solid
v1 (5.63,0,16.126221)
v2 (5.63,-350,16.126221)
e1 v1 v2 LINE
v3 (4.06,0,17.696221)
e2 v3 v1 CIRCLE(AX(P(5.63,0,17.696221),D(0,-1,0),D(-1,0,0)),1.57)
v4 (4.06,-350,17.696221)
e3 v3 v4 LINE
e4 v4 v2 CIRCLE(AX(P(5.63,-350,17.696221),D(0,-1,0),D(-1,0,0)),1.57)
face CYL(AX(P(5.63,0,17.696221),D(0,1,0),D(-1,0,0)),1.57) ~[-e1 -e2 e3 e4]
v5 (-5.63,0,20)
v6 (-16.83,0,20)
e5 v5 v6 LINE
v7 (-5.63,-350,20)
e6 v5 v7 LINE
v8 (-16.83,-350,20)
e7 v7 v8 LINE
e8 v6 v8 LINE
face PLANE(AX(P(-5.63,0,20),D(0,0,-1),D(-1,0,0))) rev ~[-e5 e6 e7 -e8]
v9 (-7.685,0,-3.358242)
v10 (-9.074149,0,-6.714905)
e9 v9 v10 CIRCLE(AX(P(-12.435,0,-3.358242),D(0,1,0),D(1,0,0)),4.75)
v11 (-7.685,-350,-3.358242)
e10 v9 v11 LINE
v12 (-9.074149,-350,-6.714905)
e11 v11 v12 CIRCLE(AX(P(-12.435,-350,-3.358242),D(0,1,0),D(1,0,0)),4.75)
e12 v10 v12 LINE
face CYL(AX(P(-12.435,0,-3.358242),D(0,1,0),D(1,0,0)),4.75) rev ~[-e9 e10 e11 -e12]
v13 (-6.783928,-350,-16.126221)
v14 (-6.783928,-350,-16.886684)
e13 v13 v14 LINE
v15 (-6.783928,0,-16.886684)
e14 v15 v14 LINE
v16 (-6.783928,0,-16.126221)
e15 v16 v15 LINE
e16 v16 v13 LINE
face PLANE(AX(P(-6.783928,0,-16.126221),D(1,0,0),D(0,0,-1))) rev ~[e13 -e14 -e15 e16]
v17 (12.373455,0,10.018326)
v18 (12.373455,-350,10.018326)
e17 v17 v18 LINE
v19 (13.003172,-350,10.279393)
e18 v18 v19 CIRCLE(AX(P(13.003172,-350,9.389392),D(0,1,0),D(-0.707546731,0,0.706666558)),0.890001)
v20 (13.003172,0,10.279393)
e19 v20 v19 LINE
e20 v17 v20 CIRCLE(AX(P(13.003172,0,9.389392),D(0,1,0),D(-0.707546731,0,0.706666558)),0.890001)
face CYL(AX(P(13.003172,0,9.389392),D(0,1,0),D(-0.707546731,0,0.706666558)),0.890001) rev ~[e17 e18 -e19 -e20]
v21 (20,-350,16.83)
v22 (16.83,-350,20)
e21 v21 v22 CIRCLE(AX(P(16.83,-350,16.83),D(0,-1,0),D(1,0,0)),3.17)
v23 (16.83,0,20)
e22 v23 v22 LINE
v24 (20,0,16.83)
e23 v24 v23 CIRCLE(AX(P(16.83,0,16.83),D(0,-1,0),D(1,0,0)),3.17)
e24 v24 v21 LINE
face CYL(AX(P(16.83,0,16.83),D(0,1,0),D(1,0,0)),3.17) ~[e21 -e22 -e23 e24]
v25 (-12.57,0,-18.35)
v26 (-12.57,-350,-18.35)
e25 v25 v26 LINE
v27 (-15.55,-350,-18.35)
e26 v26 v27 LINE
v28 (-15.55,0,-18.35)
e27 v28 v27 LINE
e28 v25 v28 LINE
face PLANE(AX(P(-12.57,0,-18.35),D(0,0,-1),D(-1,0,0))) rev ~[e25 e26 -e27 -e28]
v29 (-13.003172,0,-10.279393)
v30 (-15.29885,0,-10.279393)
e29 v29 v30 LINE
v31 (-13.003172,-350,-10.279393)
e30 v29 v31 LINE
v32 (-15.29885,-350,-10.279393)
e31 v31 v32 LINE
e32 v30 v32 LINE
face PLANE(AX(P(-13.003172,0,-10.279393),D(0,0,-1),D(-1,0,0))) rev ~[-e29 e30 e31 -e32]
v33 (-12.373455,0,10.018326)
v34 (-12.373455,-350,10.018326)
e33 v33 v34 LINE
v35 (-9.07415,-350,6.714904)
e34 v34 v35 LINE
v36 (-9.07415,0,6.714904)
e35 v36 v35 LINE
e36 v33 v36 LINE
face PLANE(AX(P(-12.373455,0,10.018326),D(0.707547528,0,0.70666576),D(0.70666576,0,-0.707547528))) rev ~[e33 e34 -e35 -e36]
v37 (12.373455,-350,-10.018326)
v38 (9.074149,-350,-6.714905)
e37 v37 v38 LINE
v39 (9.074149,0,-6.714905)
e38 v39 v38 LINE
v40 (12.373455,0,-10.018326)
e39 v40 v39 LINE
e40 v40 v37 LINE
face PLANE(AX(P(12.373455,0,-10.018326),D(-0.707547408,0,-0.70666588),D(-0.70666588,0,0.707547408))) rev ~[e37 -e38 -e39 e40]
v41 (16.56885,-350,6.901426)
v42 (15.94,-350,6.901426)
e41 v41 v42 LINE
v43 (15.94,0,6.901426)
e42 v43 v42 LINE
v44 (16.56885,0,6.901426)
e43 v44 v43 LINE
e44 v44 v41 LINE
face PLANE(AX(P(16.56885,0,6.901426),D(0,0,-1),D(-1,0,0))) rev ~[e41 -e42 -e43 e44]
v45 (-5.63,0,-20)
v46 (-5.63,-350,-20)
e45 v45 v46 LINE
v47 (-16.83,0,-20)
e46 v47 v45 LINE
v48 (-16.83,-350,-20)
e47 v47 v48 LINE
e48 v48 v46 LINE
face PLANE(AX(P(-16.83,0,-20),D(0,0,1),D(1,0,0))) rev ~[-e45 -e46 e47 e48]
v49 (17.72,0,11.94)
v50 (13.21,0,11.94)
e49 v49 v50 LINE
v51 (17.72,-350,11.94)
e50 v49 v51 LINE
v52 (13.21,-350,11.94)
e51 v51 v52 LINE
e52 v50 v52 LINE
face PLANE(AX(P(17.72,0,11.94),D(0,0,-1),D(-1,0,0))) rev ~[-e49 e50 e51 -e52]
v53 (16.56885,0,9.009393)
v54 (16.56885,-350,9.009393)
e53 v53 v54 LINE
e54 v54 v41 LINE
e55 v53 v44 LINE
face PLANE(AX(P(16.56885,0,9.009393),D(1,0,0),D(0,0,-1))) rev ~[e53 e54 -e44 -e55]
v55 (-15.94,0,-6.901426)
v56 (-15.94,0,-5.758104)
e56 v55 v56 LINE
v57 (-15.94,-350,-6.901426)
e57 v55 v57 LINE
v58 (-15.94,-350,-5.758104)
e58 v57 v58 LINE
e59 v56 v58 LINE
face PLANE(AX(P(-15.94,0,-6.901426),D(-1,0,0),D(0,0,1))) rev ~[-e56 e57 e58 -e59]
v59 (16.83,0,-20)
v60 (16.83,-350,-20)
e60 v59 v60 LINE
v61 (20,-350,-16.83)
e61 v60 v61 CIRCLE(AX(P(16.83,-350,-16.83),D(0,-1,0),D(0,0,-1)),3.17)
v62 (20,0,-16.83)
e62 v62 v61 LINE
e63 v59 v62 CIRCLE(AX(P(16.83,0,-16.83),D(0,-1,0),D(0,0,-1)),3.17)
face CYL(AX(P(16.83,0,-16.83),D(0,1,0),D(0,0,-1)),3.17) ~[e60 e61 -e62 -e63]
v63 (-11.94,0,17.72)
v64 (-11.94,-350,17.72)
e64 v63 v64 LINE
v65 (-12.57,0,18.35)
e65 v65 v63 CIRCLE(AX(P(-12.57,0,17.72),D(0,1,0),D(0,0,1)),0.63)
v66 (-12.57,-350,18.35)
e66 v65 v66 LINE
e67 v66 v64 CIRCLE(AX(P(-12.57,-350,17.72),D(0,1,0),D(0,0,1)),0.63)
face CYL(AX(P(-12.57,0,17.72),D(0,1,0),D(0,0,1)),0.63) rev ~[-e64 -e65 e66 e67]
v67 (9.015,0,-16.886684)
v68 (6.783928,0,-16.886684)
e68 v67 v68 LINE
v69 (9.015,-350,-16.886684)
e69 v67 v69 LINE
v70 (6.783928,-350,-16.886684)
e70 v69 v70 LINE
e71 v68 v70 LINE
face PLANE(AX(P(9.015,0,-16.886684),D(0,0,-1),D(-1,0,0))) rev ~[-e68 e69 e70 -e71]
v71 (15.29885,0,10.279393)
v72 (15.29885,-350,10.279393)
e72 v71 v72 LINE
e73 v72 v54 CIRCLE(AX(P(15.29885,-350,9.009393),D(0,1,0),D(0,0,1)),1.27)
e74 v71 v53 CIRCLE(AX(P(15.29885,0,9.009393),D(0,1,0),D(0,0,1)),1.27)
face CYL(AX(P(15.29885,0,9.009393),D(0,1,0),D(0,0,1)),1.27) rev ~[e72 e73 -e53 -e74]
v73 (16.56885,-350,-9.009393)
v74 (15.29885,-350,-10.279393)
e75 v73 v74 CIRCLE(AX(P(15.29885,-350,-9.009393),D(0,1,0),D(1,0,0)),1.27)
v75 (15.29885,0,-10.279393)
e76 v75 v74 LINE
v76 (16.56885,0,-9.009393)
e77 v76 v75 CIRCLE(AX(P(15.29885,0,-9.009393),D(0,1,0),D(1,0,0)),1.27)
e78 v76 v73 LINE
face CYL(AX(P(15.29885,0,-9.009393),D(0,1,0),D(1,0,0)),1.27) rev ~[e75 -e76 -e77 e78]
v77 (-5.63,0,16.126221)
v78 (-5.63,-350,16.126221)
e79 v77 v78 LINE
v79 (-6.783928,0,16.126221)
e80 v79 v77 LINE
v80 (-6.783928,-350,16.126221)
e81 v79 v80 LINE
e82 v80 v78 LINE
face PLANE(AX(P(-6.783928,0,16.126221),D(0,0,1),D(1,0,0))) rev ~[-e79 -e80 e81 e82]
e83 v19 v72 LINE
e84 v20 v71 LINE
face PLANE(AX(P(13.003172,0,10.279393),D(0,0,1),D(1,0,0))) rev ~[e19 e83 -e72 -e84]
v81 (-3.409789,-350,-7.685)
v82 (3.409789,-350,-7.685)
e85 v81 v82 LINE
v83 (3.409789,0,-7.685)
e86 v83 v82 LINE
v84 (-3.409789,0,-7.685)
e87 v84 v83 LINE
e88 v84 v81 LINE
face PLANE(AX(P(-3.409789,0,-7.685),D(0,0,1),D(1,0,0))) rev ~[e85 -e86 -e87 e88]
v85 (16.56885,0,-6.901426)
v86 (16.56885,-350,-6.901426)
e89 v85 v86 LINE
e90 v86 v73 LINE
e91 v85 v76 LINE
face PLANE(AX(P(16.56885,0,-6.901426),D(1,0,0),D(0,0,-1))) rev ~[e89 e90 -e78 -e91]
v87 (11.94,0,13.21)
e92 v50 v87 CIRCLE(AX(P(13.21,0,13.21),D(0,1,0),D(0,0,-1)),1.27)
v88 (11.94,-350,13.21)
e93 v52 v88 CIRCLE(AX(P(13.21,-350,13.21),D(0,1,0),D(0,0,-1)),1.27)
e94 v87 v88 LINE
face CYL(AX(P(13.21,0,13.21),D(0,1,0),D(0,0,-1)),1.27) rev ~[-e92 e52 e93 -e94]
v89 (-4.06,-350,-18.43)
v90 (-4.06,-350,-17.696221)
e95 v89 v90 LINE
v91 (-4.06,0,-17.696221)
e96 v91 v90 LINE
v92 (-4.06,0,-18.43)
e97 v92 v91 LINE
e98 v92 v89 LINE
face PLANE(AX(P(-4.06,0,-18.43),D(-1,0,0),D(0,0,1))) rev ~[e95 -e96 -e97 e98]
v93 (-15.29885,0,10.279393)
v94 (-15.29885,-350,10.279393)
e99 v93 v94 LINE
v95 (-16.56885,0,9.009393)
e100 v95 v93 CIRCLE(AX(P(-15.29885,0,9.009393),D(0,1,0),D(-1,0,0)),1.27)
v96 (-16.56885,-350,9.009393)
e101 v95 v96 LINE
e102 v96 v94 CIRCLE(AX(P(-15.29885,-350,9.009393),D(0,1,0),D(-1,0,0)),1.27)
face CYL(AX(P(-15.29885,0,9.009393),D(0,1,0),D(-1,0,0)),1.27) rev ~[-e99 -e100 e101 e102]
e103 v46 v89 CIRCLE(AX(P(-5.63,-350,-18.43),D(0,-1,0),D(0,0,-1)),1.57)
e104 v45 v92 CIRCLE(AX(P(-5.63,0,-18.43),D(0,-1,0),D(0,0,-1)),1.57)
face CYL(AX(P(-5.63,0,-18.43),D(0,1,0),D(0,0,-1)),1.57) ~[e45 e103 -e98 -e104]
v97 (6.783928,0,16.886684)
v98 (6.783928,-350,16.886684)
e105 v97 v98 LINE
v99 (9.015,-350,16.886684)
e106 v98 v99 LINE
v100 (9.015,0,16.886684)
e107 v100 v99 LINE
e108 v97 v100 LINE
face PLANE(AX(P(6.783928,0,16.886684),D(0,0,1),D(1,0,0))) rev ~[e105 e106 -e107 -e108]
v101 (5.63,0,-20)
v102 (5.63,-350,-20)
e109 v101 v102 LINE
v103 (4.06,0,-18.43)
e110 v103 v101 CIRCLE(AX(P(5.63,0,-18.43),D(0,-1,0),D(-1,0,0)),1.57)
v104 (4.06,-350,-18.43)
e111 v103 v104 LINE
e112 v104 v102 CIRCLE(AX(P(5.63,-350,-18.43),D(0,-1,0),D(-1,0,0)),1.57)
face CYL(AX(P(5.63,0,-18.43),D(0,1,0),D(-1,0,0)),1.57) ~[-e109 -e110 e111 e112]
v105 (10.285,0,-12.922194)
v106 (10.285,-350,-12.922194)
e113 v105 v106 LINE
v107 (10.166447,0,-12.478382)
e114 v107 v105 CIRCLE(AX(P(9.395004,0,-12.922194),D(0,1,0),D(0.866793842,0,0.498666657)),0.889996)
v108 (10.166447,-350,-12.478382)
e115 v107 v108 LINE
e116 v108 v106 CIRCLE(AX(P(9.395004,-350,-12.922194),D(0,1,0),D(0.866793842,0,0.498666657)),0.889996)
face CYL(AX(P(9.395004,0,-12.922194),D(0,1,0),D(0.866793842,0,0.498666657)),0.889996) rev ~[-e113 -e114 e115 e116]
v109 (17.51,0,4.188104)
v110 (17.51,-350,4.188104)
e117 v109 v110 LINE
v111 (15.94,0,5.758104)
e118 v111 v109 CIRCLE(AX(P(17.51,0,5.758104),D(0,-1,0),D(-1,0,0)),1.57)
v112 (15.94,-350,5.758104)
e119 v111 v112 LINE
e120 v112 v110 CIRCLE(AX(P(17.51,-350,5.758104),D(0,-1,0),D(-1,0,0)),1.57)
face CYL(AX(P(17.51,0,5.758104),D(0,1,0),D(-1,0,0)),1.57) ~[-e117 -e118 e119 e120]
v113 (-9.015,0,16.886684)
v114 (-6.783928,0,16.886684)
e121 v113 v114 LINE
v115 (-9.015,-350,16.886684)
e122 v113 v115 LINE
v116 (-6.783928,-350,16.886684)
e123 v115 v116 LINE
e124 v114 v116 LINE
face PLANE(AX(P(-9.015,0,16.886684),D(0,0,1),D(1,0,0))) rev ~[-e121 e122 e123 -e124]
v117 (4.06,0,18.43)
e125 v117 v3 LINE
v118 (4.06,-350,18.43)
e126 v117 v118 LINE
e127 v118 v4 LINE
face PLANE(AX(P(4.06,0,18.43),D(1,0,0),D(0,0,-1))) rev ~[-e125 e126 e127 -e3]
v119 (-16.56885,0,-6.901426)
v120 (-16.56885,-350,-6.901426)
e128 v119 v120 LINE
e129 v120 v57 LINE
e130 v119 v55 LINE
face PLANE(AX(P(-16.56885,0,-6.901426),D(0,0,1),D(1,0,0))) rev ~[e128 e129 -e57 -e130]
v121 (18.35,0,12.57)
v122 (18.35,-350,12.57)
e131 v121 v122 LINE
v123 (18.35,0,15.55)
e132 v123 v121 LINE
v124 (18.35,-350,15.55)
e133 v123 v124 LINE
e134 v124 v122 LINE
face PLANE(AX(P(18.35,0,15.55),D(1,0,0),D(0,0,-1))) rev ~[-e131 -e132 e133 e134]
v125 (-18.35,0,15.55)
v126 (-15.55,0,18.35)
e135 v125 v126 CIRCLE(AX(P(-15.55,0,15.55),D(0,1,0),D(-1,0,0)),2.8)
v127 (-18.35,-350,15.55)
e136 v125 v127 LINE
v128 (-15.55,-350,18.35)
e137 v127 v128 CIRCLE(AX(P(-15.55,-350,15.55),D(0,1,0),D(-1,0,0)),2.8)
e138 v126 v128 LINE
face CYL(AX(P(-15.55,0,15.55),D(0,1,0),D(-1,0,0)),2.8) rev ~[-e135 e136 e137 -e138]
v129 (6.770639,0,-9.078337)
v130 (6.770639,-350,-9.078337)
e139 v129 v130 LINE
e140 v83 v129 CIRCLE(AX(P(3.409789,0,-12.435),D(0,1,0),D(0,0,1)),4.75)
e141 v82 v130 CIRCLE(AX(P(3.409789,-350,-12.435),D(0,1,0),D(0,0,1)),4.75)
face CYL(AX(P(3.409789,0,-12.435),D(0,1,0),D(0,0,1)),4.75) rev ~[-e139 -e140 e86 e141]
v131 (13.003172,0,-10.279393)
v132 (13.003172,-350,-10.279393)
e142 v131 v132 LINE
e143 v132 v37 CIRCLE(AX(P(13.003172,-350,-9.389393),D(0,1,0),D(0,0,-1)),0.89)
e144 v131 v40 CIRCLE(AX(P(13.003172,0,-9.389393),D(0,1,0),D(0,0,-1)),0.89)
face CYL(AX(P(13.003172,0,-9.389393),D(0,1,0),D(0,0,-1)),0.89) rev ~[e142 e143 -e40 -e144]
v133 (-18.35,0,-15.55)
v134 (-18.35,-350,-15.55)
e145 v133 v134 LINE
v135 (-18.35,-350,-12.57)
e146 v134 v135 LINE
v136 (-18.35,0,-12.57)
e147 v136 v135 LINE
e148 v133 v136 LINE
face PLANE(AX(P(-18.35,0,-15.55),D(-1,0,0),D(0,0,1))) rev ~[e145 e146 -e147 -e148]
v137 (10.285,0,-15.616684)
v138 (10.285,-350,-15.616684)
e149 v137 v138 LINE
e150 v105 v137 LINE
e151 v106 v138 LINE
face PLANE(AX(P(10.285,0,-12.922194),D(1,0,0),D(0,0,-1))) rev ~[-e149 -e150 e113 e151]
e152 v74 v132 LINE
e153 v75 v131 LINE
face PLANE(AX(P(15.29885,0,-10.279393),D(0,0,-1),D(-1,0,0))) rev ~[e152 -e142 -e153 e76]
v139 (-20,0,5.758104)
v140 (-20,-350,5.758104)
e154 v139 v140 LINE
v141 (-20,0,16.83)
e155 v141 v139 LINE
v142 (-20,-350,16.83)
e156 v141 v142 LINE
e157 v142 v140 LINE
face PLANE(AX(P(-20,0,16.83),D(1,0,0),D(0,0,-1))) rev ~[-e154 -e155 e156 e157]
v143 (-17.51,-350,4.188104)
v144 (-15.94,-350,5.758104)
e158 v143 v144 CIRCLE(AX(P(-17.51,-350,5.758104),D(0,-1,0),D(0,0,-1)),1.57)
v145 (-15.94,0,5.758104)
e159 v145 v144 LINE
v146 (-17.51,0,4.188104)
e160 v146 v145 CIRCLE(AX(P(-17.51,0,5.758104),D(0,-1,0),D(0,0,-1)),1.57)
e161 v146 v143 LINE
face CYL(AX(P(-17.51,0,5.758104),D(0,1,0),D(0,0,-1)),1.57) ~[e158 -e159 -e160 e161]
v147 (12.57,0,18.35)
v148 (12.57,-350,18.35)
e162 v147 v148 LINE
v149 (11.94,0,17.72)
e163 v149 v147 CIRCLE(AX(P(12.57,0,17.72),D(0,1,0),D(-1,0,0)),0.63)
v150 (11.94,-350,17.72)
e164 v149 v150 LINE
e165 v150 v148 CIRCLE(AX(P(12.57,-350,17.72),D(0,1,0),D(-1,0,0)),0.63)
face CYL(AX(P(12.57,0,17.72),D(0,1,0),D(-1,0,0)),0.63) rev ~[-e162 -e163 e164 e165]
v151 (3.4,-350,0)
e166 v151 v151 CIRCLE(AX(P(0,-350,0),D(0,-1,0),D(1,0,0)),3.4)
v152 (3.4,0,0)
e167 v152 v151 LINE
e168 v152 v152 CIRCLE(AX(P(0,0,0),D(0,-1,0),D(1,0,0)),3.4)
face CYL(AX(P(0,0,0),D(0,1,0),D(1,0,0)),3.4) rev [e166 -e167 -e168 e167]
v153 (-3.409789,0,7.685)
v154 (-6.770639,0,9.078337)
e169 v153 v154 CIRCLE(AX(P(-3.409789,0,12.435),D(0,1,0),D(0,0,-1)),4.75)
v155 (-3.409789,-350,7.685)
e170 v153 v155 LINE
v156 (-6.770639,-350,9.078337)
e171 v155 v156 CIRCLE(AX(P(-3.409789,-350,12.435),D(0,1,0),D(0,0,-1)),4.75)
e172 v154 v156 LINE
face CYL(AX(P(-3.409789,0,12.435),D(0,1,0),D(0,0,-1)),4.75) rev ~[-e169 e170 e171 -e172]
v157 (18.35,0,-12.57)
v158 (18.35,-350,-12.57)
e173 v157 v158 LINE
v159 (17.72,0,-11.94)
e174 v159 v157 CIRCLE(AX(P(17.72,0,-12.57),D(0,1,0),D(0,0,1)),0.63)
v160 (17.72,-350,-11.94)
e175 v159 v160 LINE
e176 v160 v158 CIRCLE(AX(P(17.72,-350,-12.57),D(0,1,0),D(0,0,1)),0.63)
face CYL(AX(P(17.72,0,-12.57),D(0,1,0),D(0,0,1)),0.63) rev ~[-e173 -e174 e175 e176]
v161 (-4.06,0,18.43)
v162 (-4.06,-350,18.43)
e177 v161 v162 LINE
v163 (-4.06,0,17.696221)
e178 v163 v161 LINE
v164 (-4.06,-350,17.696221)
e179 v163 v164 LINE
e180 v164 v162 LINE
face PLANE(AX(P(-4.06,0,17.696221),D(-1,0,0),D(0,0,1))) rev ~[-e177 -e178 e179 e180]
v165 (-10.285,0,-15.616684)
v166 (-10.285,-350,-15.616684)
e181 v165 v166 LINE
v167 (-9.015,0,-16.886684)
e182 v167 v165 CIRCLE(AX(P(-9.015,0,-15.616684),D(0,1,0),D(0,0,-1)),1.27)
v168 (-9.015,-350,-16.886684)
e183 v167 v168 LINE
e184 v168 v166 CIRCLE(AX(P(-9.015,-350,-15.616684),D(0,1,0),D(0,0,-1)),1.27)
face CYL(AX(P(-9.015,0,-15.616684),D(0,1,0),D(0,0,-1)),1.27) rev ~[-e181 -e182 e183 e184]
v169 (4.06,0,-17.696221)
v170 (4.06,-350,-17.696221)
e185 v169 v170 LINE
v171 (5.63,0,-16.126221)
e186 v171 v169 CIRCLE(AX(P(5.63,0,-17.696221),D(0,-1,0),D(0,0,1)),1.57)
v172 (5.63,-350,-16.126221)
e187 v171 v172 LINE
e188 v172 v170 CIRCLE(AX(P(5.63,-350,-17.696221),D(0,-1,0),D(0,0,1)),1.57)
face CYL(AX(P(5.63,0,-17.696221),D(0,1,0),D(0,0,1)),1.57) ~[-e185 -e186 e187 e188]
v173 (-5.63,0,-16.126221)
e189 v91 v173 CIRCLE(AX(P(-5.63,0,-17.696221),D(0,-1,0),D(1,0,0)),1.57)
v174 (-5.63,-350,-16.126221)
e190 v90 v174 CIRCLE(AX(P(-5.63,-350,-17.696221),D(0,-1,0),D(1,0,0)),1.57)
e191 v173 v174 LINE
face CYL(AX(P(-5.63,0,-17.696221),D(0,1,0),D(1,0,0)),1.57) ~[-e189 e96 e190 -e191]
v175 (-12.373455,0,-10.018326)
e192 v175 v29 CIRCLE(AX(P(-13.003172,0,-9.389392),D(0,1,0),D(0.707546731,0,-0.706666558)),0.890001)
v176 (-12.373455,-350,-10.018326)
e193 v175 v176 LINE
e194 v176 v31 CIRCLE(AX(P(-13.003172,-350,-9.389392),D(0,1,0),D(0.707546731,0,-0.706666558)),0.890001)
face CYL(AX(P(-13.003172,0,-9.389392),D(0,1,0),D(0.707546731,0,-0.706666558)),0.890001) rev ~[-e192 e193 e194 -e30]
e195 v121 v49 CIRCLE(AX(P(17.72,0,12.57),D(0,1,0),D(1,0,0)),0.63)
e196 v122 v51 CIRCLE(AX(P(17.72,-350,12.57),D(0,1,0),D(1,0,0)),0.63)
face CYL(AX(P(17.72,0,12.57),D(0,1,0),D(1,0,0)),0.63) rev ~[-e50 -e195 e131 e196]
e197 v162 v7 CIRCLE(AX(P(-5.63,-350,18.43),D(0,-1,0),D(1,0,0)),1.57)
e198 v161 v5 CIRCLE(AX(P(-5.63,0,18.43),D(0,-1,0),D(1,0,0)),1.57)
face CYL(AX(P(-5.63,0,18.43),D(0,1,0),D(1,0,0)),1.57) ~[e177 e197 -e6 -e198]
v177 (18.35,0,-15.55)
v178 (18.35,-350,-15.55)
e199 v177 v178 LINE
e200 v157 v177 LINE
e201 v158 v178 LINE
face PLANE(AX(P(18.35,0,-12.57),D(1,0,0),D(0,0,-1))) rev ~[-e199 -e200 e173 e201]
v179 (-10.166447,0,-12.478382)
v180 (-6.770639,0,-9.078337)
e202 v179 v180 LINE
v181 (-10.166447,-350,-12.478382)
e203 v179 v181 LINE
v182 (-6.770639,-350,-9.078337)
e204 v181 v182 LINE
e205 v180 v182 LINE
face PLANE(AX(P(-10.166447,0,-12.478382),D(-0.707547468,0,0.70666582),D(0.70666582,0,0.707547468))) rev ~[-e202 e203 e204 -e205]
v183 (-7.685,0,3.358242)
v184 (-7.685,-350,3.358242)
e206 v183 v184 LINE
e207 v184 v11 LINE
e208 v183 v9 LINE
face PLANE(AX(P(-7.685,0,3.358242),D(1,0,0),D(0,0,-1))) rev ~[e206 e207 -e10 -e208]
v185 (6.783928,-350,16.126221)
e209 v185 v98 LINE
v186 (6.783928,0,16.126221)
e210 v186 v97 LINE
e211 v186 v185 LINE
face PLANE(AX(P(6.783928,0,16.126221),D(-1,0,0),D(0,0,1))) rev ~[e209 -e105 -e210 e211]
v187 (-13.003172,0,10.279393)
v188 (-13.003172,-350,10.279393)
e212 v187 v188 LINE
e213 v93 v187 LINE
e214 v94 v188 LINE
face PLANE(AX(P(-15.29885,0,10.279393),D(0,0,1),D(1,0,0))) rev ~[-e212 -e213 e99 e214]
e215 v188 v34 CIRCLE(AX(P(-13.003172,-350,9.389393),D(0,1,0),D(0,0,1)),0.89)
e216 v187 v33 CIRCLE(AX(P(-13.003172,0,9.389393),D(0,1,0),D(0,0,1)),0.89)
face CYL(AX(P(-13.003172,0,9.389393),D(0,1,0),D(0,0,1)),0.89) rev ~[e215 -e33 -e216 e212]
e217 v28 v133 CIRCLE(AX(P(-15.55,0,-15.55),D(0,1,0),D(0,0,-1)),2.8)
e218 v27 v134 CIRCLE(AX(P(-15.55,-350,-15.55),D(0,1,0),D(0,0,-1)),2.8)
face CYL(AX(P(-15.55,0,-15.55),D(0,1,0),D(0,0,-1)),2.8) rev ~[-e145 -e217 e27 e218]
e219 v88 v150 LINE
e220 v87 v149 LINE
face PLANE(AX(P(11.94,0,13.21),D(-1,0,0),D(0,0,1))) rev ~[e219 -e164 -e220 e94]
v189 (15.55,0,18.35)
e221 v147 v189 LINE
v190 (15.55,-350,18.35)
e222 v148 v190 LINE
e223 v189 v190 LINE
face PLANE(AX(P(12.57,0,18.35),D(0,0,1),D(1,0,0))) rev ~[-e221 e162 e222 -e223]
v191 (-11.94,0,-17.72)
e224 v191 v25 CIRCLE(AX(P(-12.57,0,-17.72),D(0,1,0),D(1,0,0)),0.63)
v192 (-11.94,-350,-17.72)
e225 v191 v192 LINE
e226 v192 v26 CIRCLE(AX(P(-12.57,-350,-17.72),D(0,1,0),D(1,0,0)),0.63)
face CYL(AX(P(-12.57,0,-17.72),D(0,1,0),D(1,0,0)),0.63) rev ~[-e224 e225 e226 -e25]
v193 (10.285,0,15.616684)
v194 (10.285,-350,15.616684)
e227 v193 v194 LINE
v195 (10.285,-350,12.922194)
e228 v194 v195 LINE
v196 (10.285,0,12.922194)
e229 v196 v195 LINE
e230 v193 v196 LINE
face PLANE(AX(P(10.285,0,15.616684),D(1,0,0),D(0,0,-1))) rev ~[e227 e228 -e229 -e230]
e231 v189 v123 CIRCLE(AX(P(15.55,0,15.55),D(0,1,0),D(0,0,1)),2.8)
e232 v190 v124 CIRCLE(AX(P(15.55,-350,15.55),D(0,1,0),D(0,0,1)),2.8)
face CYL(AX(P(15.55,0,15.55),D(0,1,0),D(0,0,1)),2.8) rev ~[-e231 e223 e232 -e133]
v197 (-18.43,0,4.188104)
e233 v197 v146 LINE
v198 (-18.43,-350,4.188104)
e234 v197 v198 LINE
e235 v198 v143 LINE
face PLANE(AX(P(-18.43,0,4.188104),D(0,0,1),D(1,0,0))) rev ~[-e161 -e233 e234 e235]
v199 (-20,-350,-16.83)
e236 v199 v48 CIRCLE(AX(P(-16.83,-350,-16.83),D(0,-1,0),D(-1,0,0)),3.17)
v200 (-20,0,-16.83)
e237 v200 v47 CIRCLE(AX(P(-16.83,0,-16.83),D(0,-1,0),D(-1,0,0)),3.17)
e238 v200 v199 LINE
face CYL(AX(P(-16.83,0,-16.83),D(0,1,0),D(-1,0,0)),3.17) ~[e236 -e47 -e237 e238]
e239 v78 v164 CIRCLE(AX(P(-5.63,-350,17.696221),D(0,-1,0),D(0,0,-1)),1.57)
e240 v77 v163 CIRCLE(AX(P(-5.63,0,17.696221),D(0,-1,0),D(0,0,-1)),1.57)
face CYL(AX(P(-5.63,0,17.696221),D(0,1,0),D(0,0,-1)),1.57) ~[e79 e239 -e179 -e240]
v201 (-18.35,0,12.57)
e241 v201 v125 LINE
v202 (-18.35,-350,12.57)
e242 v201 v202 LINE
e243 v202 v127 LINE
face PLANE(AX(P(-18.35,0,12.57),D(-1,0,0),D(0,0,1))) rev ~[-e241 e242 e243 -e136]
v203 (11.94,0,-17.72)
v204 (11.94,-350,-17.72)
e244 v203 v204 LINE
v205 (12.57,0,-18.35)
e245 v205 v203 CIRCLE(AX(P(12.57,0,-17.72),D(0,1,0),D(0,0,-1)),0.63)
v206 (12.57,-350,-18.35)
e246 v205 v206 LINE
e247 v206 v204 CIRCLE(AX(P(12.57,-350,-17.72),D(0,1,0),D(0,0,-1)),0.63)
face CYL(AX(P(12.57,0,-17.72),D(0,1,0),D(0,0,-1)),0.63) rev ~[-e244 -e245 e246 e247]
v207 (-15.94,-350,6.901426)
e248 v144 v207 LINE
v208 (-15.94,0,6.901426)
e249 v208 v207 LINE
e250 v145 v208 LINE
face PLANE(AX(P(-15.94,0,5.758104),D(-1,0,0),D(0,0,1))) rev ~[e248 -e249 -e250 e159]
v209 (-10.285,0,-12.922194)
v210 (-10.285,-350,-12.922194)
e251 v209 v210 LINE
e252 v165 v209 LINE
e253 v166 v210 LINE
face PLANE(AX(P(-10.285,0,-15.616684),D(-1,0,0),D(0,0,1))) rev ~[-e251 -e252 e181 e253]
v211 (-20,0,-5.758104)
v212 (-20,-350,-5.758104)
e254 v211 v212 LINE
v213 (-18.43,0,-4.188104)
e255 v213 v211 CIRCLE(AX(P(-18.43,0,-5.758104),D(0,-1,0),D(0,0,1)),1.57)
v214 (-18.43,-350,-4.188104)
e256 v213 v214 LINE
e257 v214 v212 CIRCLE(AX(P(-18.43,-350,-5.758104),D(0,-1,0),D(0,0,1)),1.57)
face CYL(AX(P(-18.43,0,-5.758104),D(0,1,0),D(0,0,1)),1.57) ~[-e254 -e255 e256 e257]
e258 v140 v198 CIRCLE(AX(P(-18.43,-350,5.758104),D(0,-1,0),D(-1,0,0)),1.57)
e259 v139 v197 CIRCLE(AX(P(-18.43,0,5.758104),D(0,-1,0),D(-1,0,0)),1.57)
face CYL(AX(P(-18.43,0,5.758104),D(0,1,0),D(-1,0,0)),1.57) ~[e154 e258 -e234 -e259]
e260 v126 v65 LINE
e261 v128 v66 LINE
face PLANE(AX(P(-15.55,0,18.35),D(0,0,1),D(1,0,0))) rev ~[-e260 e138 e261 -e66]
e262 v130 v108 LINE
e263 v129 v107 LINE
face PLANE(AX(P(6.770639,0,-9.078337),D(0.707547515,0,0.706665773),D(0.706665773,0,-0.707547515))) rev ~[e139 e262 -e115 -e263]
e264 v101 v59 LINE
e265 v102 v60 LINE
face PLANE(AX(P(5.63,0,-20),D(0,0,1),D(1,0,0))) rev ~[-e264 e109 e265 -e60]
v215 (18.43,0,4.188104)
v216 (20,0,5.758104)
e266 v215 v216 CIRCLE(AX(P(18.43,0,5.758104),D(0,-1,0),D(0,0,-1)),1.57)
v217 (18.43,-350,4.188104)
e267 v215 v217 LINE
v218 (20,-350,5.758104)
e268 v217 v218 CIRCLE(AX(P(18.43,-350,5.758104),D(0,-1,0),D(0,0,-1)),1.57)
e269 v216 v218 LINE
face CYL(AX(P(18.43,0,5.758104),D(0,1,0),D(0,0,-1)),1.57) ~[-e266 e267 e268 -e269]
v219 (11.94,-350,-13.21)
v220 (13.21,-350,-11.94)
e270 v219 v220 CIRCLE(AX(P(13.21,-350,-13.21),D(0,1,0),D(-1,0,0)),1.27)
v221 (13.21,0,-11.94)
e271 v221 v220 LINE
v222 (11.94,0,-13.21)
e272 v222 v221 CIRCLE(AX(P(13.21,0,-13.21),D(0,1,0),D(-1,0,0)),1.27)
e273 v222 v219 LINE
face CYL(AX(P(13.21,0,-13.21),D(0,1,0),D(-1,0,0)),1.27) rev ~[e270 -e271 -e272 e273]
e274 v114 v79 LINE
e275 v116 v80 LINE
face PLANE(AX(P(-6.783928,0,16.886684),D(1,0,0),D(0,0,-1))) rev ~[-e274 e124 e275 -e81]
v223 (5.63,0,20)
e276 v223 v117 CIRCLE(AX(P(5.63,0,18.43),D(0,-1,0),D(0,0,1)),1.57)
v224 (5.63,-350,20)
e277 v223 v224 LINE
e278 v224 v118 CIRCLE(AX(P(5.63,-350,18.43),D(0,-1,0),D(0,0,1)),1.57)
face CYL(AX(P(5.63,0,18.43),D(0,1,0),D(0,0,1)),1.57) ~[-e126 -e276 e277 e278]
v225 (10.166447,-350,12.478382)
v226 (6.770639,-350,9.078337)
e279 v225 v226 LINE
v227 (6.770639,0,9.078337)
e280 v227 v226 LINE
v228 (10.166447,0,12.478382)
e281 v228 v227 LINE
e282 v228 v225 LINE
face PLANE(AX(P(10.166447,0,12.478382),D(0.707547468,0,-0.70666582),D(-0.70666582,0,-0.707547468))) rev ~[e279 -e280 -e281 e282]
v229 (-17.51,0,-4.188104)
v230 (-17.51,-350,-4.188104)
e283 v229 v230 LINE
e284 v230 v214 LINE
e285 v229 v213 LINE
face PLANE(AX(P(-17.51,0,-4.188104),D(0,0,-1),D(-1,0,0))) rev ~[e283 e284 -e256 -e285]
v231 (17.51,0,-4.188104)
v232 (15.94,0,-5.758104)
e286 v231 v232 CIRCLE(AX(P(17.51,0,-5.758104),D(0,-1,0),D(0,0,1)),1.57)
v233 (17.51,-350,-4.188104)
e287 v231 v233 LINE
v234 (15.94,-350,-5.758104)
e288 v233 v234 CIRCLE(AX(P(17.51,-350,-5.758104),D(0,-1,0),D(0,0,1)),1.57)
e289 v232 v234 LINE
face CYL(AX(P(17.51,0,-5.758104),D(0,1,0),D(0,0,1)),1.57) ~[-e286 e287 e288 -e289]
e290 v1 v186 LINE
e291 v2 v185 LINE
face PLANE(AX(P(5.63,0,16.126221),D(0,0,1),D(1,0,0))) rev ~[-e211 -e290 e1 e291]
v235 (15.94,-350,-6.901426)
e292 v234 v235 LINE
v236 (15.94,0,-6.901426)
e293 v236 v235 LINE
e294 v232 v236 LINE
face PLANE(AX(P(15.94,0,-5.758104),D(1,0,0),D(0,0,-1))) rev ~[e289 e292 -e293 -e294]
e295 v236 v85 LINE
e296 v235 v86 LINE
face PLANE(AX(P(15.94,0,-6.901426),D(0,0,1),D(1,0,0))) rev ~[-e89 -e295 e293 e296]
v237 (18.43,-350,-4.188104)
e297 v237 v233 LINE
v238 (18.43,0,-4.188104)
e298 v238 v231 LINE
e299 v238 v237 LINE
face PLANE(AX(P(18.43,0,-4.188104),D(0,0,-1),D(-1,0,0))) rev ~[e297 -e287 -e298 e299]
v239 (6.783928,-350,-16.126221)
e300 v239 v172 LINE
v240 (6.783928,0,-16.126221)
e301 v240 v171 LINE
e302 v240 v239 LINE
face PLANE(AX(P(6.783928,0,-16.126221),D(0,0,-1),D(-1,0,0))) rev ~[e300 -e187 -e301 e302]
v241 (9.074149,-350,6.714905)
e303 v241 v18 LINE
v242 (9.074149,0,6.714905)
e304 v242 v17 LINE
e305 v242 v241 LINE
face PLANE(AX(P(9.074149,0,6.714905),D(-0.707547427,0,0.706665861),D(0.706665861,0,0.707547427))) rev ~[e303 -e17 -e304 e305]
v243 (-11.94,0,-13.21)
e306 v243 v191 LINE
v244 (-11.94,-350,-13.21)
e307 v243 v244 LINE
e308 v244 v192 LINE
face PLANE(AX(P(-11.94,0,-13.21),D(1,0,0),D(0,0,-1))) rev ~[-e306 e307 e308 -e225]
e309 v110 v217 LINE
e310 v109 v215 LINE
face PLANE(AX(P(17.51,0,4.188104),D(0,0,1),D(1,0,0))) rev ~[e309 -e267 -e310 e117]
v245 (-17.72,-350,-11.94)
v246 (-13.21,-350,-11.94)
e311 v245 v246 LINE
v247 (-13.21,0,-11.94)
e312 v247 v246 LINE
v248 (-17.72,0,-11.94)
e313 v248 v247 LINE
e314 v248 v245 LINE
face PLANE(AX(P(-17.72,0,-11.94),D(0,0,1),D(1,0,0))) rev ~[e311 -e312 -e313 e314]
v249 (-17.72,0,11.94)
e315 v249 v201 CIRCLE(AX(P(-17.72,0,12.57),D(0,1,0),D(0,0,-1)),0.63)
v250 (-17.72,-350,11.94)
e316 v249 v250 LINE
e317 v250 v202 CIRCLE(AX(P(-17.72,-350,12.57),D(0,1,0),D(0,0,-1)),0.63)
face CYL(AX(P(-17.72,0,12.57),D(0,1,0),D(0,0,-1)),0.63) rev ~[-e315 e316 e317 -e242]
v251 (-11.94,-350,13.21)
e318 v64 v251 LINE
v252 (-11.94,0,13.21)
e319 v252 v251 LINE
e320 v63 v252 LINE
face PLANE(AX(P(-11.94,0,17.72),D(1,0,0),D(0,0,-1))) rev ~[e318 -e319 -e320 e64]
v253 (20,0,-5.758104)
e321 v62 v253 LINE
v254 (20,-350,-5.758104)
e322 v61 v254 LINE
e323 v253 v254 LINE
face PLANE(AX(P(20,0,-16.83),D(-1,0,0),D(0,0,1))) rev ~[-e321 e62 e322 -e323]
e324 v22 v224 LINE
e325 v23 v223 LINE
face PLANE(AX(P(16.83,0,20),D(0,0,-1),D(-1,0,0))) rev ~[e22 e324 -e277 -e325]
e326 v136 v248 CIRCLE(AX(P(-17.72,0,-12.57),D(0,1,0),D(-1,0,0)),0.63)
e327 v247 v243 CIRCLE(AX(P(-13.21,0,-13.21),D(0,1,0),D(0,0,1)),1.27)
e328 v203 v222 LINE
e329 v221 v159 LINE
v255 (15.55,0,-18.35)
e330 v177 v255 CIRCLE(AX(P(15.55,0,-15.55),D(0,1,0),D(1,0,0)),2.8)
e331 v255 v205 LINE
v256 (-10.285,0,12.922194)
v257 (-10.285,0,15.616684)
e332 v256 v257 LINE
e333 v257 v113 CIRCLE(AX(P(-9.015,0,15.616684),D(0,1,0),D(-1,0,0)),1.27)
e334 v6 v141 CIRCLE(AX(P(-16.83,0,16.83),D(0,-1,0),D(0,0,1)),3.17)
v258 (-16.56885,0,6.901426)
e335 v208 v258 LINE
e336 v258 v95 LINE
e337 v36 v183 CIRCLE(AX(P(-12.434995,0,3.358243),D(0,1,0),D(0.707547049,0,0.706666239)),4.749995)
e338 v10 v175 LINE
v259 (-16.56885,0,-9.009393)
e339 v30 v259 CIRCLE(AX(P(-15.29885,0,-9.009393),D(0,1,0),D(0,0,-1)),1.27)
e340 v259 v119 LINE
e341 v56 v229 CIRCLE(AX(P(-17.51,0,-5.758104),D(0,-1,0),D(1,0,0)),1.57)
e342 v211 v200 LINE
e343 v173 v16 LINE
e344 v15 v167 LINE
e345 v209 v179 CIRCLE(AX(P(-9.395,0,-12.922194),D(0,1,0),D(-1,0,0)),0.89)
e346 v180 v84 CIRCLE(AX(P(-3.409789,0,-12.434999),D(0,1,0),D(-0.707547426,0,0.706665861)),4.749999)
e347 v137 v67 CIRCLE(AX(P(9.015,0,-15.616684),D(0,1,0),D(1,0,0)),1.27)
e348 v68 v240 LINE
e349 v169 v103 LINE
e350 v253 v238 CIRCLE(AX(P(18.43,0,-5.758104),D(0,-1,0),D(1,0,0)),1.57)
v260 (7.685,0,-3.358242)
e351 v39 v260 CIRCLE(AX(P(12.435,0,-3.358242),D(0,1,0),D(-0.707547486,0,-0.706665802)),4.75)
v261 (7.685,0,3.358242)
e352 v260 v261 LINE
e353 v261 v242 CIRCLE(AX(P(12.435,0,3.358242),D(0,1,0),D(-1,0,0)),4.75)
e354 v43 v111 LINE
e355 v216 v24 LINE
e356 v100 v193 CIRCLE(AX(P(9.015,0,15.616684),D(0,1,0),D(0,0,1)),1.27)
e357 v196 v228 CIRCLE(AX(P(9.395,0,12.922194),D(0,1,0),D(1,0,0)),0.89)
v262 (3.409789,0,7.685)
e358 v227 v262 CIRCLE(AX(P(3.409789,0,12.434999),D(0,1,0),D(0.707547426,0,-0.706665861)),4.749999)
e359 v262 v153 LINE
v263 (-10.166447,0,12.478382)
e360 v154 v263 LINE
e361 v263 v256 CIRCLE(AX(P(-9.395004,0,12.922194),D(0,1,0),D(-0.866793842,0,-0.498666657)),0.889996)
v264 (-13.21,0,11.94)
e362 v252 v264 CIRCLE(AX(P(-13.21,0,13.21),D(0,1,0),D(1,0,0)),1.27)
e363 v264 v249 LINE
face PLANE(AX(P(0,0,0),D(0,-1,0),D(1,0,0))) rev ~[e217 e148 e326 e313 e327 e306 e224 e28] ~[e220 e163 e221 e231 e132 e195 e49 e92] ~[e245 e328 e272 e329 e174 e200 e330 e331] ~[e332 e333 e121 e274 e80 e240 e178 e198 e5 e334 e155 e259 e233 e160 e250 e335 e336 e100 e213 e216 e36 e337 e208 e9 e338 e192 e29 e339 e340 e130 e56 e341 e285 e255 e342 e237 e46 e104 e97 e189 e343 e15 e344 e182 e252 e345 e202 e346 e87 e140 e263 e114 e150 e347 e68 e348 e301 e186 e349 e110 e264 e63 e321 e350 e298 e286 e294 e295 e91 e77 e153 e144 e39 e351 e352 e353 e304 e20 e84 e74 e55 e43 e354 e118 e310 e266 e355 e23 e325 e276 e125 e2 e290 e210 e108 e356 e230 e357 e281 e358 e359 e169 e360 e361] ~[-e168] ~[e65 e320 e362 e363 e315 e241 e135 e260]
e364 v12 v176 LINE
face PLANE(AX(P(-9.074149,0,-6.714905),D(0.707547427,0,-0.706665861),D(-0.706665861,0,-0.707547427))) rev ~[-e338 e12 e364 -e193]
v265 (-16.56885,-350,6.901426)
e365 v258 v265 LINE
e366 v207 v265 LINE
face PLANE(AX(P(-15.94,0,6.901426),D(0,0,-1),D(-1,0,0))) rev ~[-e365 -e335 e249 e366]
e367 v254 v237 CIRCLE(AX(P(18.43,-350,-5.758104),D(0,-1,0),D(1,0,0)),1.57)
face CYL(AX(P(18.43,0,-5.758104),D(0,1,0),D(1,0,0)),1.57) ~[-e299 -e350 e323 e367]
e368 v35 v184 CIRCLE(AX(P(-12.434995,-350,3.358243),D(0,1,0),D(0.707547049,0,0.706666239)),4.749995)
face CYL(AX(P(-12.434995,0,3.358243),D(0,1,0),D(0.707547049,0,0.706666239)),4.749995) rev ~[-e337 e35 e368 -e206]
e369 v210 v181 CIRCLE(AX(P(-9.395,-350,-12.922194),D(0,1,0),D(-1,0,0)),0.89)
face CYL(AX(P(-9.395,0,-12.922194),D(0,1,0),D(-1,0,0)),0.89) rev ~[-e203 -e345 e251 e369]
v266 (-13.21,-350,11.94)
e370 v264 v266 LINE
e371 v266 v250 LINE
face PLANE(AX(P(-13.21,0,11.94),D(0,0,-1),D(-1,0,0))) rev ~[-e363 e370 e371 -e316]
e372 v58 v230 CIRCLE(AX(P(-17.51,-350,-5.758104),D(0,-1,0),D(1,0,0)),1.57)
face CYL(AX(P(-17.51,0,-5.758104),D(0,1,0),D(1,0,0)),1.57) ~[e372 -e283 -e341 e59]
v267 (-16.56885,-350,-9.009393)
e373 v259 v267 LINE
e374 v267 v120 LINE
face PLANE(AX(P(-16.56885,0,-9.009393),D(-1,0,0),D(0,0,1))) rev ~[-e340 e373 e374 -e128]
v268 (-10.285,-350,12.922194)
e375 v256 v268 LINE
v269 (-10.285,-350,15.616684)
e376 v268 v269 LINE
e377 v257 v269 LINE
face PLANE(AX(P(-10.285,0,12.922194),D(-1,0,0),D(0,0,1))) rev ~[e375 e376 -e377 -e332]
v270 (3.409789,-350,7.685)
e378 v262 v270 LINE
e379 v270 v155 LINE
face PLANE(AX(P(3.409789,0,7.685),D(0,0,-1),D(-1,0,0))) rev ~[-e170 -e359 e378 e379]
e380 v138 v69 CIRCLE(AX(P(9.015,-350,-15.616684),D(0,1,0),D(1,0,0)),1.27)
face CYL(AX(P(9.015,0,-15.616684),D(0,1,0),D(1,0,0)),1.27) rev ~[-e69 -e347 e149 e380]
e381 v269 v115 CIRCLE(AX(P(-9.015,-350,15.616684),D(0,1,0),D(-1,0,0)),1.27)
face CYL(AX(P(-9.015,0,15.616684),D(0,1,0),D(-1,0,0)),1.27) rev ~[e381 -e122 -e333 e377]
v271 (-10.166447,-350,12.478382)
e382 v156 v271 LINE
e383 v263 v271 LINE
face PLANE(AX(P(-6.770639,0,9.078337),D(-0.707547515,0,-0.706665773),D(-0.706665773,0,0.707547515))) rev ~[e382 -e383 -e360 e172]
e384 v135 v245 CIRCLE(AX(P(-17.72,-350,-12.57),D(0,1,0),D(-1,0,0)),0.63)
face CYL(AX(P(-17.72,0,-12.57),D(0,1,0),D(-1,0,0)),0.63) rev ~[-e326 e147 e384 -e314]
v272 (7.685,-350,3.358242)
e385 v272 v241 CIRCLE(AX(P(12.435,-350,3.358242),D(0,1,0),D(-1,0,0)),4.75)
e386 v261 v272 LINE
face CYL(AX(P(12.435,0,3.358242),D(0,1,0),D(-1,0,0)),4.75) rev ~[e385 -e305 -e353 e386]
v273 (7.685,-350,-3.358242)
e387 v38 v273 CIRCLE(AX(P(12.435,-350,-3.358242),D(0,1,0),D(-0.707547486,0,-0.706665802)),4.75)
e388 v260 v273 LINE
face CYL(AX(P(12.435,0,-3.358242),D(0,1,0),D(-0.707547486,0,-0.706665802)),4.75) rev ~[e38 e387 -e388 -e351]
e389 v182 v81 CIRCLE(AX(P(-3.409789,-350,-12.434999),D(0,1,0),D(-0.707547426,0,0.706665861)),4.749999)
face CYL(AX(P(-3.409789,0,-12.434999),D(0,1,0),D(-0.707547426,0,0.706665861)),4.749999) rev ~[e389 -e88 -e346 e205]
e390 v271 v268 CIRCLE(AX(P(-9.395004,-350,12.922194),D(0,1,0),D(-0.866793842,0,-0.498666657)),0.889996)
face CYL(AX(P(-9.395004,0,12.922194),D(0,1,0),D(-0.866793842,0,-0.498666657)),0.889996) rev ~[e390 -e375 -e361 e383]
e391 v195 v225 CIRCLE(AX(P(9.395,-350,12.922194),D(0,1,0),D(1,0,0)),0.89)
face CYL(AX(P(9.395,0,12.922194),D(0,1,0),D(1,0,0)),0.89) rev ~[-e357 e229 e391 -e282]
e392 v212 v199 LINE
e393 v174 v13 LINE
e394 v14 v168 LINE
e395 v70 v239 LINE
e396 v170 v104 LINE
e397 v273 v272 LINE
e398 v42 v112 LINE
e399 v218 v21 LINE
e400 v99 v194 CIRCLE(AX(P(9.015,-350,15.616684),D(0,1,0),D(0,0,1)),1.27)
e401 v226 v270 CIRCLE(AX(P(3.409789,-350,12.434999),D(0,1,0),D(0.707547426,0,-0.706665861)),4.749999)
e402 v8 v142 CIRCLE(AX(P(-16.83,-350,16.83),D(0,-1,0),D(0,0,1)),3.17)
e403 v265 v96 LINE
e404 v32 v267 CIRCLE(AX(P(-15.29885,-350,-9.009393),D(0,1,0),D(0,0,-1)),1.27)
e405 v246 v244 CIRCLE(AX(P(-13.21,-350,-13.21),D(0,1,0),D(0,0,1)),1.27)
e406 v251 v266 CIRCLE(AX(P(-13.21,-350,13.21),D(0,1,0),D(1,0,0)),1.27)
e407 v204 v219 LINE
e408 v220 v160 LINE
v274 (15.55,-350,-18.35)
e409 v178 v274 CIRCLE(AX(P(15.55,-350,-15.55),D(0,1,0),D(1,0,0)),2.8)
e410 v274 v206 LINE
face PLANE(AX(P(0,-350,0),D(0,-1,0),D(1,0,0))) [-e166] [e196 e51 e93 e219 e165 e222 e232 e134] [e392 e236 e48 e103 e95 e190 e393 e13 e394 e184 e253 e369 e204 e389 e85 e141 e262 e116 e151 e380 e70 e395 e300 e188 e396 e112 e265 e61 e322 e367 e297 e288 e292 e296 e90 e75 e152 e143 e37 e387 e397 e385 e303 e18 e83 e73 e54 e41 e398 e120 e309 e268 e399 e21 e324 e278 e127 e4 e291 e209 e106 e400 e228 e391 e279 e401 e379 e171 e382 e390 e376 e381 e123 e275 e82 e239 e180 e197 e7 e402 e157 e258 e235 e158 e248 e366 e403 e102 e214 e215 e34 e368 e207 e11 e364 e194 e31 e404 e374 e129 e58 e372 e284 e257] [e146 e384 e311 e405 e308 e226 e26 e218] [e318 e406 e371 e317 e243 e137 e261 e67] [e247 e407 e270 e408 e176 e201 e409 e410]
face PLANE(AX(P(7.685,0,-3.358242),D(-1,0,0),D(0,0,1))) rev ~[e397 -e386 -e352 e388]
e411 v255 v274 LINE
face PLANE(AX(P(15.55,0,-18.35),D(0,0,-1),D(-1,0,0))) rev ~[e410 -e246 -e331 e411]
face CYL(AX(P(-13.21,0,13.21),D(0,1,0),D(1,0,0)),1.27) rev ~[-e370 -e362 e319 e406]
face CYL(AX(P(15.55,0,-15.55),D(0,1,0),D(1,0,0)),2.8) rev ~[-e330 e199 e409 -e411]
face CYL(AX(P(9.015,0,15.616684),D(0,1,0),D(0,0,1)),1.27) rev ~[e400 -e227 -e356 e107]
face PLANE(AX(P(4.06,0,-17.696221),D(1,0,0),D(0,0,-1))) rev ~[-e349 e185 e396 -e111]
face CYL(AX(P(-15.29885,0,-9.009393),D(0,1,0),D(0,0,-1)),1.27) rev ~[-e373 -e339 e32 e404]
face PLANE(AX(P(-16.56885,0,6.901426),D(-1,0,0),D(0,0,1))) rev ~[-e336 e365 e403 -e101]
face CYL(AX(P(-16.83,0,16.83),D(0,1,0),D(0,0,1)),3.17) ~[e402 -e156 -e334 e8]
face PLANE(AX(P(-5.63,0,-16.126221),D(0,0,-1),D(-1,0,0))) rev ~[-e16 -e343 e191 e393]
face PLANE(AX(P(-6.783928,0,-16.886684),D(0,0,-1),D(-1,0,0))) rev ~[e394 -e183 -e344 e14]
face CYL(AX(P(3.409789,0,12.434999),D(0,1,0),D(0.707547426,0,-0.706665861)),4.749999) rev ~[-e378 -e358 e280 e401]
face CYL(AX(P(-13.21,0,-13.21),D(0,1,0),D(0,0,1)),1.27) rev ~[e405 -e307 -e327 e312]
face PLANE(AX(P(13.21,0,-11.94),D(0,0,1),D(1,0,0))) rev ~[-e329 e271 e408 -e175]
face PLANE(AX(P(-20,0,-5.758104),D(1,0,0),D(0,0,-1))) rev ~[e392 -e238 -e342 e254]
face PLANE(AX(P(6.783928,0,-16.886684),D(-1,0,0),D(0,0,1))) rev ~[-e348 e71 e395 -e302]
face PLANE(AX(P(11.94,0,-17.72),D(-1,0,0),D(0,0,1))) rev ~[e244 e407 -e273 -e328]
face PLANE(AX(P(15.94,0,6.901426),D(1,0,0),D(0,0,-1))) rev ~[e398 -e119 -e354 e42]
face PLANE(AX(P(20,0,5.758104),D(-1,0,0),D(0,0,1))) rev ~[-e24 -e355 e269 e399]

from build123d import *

# Parameters (mm, degrees)
F0_R     = 3.4
F1_DEPTH = 350


# Not quite as in the source:
# - ends of sketch curves that miss each other by under 0.0002 mm in the source are joined


with BuildPart() as f1:
    # F0 (on Front) → F1 (new body)
    with BuildSketch(Plane.XZ):
        with BuildLine():
            ThreePointArc((9.0741494418, -6.7149045575), (8.0460058013, -5.1746202437), (7.685, -3.358242))
            Line((7.685, -3.358242), (7.685, 3.358242))
            ThreePointArc((7.685, 3.358242), (8.0460058013, 5.1746202437), (9.0741494418, 6.7149045575))
            Line((9.0741494418, 6.7149045575), (12.373455, 10.018326))
            ThreePointArc((12.373455, 10.018326), (12.6623276754, 10.2115396696), (13.003172, 10.279393))
            Line((13.003172, 10.279393), (15.29885, 10.279393))
            ThreePointArc((15.29885, 10.279393), (16.1968756121, 9.9074186121), (16.56885, 9.009393))
            Line((16.56885, 9.009393), (16.56885, 6.901426))
            Line((16.56885, 6.901426), (15.94, 6.901426))
            Line((15.94, 6.901426), (15.94, 5.758104))
            ThreePointArc((15.94, 5.758104), (16.3998423535, 4.6479463535), (17.51, 4.188104))
            Line((17.51, 4.188104), (18.43, 4.188104))
            ThreePointArc((18.43, 4.188104), (19.5401576465, 4.6479463535), (20, 5.758104))
            Line((20, 5.758104), (20, 16.83))
            ThreePointArc((20, 16.83), (19.0715284964, 19.0715284964), (16.83, 20))
            Line((16.83, 20), (5.63, 20))
            ThreePointArc((5.63, 20), (4.5198423535, 19.5401576465), (4.06, 18.43))
            Line((4.06, 18.43), (4.06, 17.696221))
            ThreePointArc((4.06, 17.696221), (4.5198423535, 16.5860633535), (5.63, 16.126221))
            Line((5.63, 16.126221), (6.783928, 16.126221))
            Line((6.783928, 16.126221), (6.783928, 16.886684))
            Line((6.783928, 16.886684), (9.015, 16.886684))
            ThreePointArc((9.015, 16.886684), (9.9130256121, 16.5147096121), (10.285, 15.616684))
            Line((10.285, 15.616684), (10.285, 12.922194))
            ThreePointArc((10.285, 12.922194), (10.2548511553, 12.6925072769), (10.1664472118, 12.4783818782))
            Line((10.1664472118, 12.4783818782), (6.770639, 9.078337))
            ThreePointArc((6.770639, 9.078337), (5.2289028603, 8.0471389307), (3.409789, 7.685))
            Line((3.409789, 7.685), (-3.409789, 7.685))
            ThreePointArc((-3.409789, 7.685), (-5.2289028603, 8.0471389307), (-6.7706390582, 9.0783369418))
            Line((-6.7706390582, 9.0783369418), (-10.166447, 12.478382))
            ThreePointArc((-10.166447, 12.478382), (-10.2548511553, 12.6925072769), (-10.285, 12.922194))
            Line((-10.285, 12.922194), (-10.285, 15.616684))
            ThreePointArc((-10.285, 15.616684), (-9.9130256121, 16.5147096121), (-9.015, 16.886684))
            Line((-9.015, 16.886684), (-6.783928, 16.886684))
            Line((-6.783928, 16.886684), (-6.783928, 16.126221))
            Line((-6.783928, 16.126221), (-5.63, 16.126221))
            ThreePointArc((-5.63, 16.126221), (-4.5198423535, 16.5860633535), (-4.06, 17.696221))
            Line((-4.06, 17.696221), (-4.06, 18.43))
            ThreePointArc((-4.06, 18.43), (-4.5198423535, 19.5401576465), (-5.63, 20))
            Line((-5.63, 20), (-16.83, 20))
            ThreePointArc((-16.83, 20), (-19.0715284964, 19.0715284964), (-20, 16.83))
            Line((-20, 16.83), (-20, 5.758104))
            ThreePointArc((-20, 5.758104), (-19.5401576465, 4.6479463535), (-18.43, 4.188104))
            Line((-18.43, 4.188104), (-17.51, 4.188104))
            ThreePointArc((-17.51, 4.188104), (-16.3998423535, 4.6479463535), (-15.94, 5.758104))
            Line((-15.94, 5.758104), (-15.94, 6.901426))
            Line((-15.94, 6.901426), (-16.56885, 6.901426))
            Line((-16.56885, 6.901426), (-16.56885, 9.009393))
            ThreePointArc((-16.56885, 9.009393), (-16.1968756121, 9.9074186121), (-15.29885, 10.279393))
            Line((-15.29885, 10.279393), (-13.003172, 10.279393))
            ThreePointArc((-13.003172, 10.279393), (-12.6623276754, 10.2115396696), (-12.3734550869, 10.0183259132))
            Line((-12.3734550869, 10.0183259132), (-9.07415, 6.714904))
            ThreePointArc((-9.07415, 6.714904), (-8.0460058013, 5.1746202437), (-7.685, 3.358242))
            Line((-7.685, 3.358242), (-7.685, -3.358242))
            ThreePointArc((-7.685, -3.358242), (-8.0460058013, -5.1746202437), (-9.0741494418, -6.7149045575))
            Line((-9.0741494418, -6.7149045575), (-12.373455, -10.018326))
            ThreePointArc((-12.373455, -10.018326), (-12.6623276754, -10.2115396696), (-13.003172, -10.279393))
            Line((-13.003172, -10.279393), (-15.29885, -10.279393))
            ThreePointArc((-15.29885, -10.279393), (-16.1968756121, -9.9074186121), (-16.56885, -9.009393))
            Line((-16.56885, -9.009393), (-16.56885, -6.901426))
            Line((-16.56885, -6.901426), (-15.94, -6.901426))
            Line((-15.94, -6.901426), (-15.94, -5.758104))
            ThreePointArc((-15.94, -5.758104), (-16.3998423535, -4.6479463535), (-17.51, -4.188104))
            Line((-17.51, -4.188104), (-18.43, -4.188104))
            ThreePointArc((-18.43, -4.188104), (-19.5401576465, -4.6479463535), (-20, -5.758104))
            Line((-20, -5.758104), (-20, -16.83))
            ThreePointArc((-20, -16.83), (-19.0715284964, -19.0715284964), (-16.83, -20))
            Line((-16.83, -20), (-5.63, -20))
            ThreePointArc((-5.63, -20), (-4.5198423535, -19.5401576465), (-4.06, -18.43))
            Line((-4.06, -18.43), (-4.06, -17.696221))
            ThreePointArc((-4.06, -17.696221), (-4.5198423535, -16.5860633535), (-5.63, -16.126221))
            Line((-5.63, -16.126221), (-6.783928, -16.126221))
            Line((-6.783928, -16.126221), (-6.783928, -16.886684))
            Line((-6.783928, -16.886684), (-9.015, -16.886684))
            ThreePointArc((-9.015, -16.886684), (-9.9130256121, -16.5147096121), (-10.285, -15.616684))
            Line((-10.285, -15.616684), (-10.285, -12.922194))
            ThreePointArc((-10.285, -12.922194), (-10.2548511553, -12.6925072769), (-10.1664472118, -12.4783818782))
            Line((-10.1664472118, -12.4783818782), (-6.770639, -9.078337))
            ThreePointArc((-6.770639, -9.078337), (-5.2289028603, -8.0471389307), (-3.409789, -7.685))
            Line((-3.409789, -7.685), (3.409789, -7.685))
            ThreePointArc((3.409789, -7.685), (5.2289028603, -8.0471389307), (6.7706390582, -9.0783369418))
            Line((6.7706390582, -9.0783369418), (10.166447, -12.478382))
            ThreePointArc((10.166447, -12.478382), (10.2548511553, -12.6925072769), (10.285, -12.922194))
            Line((10.285, -12.922194), (10.285, -15.616684))
            ThreePointArc((10.285, -15.616684), (9.9130256121, -16.5147096121), (9.015, -16.886684))
            Line((9.015, -16.886684), (6.783928, -16.886684))
            Line((6.783928, -16.886684), (6.783928, -16.126221))
            Line((6.783928, -16.126221), (5.63, -16.126221))
            ThreePointArc((5.63, -16.126221), (4.5198423535, -16.5860633535), (4.06, -17.696221))
            Line((4.06, -17.696221), (4.06, -18.43))
            ThreePointArc((4.06, -18.43), (4.5198423535, -19.5401576465), (5.63, -20))
            Line((5.63, -20), (16.83, -20))
            ThreePointArc((16.83, -20), (19.0715284964, -19.0715284964), (20, -16.83))
            Line((20, -16.83), (20, -5.758104))
            ThreePointArc((20, -5.758104), (19.5401576465, -4.6479463535), (18.43, -4.188104))
            Line((18.43, -4.188104), (17.51, -4.188104))
            ThreePointArc((17.51, -4.188104), (16.3998423535, -4.6479463535), (15.94, -5.758104))
            Line((15.94, -5.758104), (15.94, -6.901426))
            Line((15.94, -6.901426), (16.56885, -6.901426))
            Line((16.56885, -6.901426), (16.56885, -9.009393))
            ThreePointArc((16.56885, -9.009393), (16.1968756121, -9.9074186121), (15.29885, -10.279393))
            Line((15.29885, -10.279393), (13.003172, -10.279393))
            ThreePointArc((13.003172, -10.279393), (12.6623276754, -10.2115396696), (12.3734550869, -10.0183259132))
            Line((12.3734550869, -10.0183259132), (9.0741494418, -6.7149045575))
        make_face()
        with BuildLine():
            Line((-12.57, -18.35), (-15.55, -18.35))
            ThreePointArc((-15.55, -18.35), (-17.5298989873, -17.5298989873), (-18.35, -15.55))
            Line((-18.35, -15.55), (-18.35, -12.57))
            ThreePointArc((-18.35, -12.57), (-18.1654772721, -12.1245227279), (-17.72, -11.94))
            Line((-17.72, -11.94), (-13.21, -11.94))
            ThreePointArc((-13.21, -11.94), (-12.3119743879, -12.3119743879), (-11.94, -13.21))
            Line((-11.94, -13.21), (-11.94, -17.72))
            ThreePointArc((-11.94, -17.72), (-12.1245227279, -18.1654772721), (-12.57, -18.35))
        make_face(mode=Mode.SUBTRACT)
        with BuildLine():
            Line((13.21, -11.94), (17.72, -11.94))
            ThreePointArc((17.72, -11.94), (18.1654772721, -12.1245227279), (18.35, -12.57))
            Line((18.35, -12.57), (18.35, -15.55))
            ThreePointArc((18.35, -15.55), (17.5298989873, -17.5298989873), (15.55, -18.35))
            Line((15.55, -18.35), (12.57, -18.35))
            ThreePointArc((12.57, -18.35), (12.1245227279, -18.1654772721), (11.94, -17.72))
            Line((11.94, -17.72), (11.94, -13.21))
            ThreePointArc((11.94, -13.21), (12.3119743879, -12.3119743879), (13.21, -11.94))
        make_face(mode=Mode.SUBTRACT)
        with BuildLine():
            ThreePointArc((-17.72, 11.94), (-18.1654772721, 12.1245227279), (-18.35, 12.57))
            Line((-18.35, 12.57), (-18.35, 15.55))
            ThreePointArc((-18.35, 15.55), (-17.5298989873, 17.5298989873), (-15.55, 18.35))
            Line((-15.55, 18.35), (-12.57, 18.35))
            ThreePointArc((-12.57, 18.35), (-12.1245227279, 18.1654772721), (-11.94, 17.72))
            Line((-11.94, 17.72), (-11.94, 13.21))
            ThreePointArc((-11.94, 13.21), (-12.3119743879, 12.3119743879), (-13.21, 11.94))
            Line((-13.21, 11.94), (-17.72, 11.94))
        make_face(mode=Mode.SUBTRACT)
        Circle(F0_R, mode=Mode.SUBTRACT)
        with BuildLine():
            Line((12.57, 18.35), (15.55, 18.35))
            ThreePointArc((15.55, 18.35), (17.5298989873, 17.5298989873), (18.35, 15.55))
            Line((18.35, 15.55), (18.35, 12.57))
            ThreePointArc((18.35, 12.57), (18.1654772721, 12.1245227279), (17.72, 11.94))
            Line((17.72, 11.94), (13.21, 11.94))
            ThreePointArc((13.21, 11.94), (12.3119743879, 12.3119743879), (11.94, 13.21))
            Line((11.94, 13.21), (11.94, 17.72))
            ThreePointArc((11.94, 17.72), (12.1245227279, 18.1654772721), (12.57, 18.35))
        make_face(mode=Mode.SUBTRACT)
    extrude(amount=F1_DEPTH)


solid = f1.part
